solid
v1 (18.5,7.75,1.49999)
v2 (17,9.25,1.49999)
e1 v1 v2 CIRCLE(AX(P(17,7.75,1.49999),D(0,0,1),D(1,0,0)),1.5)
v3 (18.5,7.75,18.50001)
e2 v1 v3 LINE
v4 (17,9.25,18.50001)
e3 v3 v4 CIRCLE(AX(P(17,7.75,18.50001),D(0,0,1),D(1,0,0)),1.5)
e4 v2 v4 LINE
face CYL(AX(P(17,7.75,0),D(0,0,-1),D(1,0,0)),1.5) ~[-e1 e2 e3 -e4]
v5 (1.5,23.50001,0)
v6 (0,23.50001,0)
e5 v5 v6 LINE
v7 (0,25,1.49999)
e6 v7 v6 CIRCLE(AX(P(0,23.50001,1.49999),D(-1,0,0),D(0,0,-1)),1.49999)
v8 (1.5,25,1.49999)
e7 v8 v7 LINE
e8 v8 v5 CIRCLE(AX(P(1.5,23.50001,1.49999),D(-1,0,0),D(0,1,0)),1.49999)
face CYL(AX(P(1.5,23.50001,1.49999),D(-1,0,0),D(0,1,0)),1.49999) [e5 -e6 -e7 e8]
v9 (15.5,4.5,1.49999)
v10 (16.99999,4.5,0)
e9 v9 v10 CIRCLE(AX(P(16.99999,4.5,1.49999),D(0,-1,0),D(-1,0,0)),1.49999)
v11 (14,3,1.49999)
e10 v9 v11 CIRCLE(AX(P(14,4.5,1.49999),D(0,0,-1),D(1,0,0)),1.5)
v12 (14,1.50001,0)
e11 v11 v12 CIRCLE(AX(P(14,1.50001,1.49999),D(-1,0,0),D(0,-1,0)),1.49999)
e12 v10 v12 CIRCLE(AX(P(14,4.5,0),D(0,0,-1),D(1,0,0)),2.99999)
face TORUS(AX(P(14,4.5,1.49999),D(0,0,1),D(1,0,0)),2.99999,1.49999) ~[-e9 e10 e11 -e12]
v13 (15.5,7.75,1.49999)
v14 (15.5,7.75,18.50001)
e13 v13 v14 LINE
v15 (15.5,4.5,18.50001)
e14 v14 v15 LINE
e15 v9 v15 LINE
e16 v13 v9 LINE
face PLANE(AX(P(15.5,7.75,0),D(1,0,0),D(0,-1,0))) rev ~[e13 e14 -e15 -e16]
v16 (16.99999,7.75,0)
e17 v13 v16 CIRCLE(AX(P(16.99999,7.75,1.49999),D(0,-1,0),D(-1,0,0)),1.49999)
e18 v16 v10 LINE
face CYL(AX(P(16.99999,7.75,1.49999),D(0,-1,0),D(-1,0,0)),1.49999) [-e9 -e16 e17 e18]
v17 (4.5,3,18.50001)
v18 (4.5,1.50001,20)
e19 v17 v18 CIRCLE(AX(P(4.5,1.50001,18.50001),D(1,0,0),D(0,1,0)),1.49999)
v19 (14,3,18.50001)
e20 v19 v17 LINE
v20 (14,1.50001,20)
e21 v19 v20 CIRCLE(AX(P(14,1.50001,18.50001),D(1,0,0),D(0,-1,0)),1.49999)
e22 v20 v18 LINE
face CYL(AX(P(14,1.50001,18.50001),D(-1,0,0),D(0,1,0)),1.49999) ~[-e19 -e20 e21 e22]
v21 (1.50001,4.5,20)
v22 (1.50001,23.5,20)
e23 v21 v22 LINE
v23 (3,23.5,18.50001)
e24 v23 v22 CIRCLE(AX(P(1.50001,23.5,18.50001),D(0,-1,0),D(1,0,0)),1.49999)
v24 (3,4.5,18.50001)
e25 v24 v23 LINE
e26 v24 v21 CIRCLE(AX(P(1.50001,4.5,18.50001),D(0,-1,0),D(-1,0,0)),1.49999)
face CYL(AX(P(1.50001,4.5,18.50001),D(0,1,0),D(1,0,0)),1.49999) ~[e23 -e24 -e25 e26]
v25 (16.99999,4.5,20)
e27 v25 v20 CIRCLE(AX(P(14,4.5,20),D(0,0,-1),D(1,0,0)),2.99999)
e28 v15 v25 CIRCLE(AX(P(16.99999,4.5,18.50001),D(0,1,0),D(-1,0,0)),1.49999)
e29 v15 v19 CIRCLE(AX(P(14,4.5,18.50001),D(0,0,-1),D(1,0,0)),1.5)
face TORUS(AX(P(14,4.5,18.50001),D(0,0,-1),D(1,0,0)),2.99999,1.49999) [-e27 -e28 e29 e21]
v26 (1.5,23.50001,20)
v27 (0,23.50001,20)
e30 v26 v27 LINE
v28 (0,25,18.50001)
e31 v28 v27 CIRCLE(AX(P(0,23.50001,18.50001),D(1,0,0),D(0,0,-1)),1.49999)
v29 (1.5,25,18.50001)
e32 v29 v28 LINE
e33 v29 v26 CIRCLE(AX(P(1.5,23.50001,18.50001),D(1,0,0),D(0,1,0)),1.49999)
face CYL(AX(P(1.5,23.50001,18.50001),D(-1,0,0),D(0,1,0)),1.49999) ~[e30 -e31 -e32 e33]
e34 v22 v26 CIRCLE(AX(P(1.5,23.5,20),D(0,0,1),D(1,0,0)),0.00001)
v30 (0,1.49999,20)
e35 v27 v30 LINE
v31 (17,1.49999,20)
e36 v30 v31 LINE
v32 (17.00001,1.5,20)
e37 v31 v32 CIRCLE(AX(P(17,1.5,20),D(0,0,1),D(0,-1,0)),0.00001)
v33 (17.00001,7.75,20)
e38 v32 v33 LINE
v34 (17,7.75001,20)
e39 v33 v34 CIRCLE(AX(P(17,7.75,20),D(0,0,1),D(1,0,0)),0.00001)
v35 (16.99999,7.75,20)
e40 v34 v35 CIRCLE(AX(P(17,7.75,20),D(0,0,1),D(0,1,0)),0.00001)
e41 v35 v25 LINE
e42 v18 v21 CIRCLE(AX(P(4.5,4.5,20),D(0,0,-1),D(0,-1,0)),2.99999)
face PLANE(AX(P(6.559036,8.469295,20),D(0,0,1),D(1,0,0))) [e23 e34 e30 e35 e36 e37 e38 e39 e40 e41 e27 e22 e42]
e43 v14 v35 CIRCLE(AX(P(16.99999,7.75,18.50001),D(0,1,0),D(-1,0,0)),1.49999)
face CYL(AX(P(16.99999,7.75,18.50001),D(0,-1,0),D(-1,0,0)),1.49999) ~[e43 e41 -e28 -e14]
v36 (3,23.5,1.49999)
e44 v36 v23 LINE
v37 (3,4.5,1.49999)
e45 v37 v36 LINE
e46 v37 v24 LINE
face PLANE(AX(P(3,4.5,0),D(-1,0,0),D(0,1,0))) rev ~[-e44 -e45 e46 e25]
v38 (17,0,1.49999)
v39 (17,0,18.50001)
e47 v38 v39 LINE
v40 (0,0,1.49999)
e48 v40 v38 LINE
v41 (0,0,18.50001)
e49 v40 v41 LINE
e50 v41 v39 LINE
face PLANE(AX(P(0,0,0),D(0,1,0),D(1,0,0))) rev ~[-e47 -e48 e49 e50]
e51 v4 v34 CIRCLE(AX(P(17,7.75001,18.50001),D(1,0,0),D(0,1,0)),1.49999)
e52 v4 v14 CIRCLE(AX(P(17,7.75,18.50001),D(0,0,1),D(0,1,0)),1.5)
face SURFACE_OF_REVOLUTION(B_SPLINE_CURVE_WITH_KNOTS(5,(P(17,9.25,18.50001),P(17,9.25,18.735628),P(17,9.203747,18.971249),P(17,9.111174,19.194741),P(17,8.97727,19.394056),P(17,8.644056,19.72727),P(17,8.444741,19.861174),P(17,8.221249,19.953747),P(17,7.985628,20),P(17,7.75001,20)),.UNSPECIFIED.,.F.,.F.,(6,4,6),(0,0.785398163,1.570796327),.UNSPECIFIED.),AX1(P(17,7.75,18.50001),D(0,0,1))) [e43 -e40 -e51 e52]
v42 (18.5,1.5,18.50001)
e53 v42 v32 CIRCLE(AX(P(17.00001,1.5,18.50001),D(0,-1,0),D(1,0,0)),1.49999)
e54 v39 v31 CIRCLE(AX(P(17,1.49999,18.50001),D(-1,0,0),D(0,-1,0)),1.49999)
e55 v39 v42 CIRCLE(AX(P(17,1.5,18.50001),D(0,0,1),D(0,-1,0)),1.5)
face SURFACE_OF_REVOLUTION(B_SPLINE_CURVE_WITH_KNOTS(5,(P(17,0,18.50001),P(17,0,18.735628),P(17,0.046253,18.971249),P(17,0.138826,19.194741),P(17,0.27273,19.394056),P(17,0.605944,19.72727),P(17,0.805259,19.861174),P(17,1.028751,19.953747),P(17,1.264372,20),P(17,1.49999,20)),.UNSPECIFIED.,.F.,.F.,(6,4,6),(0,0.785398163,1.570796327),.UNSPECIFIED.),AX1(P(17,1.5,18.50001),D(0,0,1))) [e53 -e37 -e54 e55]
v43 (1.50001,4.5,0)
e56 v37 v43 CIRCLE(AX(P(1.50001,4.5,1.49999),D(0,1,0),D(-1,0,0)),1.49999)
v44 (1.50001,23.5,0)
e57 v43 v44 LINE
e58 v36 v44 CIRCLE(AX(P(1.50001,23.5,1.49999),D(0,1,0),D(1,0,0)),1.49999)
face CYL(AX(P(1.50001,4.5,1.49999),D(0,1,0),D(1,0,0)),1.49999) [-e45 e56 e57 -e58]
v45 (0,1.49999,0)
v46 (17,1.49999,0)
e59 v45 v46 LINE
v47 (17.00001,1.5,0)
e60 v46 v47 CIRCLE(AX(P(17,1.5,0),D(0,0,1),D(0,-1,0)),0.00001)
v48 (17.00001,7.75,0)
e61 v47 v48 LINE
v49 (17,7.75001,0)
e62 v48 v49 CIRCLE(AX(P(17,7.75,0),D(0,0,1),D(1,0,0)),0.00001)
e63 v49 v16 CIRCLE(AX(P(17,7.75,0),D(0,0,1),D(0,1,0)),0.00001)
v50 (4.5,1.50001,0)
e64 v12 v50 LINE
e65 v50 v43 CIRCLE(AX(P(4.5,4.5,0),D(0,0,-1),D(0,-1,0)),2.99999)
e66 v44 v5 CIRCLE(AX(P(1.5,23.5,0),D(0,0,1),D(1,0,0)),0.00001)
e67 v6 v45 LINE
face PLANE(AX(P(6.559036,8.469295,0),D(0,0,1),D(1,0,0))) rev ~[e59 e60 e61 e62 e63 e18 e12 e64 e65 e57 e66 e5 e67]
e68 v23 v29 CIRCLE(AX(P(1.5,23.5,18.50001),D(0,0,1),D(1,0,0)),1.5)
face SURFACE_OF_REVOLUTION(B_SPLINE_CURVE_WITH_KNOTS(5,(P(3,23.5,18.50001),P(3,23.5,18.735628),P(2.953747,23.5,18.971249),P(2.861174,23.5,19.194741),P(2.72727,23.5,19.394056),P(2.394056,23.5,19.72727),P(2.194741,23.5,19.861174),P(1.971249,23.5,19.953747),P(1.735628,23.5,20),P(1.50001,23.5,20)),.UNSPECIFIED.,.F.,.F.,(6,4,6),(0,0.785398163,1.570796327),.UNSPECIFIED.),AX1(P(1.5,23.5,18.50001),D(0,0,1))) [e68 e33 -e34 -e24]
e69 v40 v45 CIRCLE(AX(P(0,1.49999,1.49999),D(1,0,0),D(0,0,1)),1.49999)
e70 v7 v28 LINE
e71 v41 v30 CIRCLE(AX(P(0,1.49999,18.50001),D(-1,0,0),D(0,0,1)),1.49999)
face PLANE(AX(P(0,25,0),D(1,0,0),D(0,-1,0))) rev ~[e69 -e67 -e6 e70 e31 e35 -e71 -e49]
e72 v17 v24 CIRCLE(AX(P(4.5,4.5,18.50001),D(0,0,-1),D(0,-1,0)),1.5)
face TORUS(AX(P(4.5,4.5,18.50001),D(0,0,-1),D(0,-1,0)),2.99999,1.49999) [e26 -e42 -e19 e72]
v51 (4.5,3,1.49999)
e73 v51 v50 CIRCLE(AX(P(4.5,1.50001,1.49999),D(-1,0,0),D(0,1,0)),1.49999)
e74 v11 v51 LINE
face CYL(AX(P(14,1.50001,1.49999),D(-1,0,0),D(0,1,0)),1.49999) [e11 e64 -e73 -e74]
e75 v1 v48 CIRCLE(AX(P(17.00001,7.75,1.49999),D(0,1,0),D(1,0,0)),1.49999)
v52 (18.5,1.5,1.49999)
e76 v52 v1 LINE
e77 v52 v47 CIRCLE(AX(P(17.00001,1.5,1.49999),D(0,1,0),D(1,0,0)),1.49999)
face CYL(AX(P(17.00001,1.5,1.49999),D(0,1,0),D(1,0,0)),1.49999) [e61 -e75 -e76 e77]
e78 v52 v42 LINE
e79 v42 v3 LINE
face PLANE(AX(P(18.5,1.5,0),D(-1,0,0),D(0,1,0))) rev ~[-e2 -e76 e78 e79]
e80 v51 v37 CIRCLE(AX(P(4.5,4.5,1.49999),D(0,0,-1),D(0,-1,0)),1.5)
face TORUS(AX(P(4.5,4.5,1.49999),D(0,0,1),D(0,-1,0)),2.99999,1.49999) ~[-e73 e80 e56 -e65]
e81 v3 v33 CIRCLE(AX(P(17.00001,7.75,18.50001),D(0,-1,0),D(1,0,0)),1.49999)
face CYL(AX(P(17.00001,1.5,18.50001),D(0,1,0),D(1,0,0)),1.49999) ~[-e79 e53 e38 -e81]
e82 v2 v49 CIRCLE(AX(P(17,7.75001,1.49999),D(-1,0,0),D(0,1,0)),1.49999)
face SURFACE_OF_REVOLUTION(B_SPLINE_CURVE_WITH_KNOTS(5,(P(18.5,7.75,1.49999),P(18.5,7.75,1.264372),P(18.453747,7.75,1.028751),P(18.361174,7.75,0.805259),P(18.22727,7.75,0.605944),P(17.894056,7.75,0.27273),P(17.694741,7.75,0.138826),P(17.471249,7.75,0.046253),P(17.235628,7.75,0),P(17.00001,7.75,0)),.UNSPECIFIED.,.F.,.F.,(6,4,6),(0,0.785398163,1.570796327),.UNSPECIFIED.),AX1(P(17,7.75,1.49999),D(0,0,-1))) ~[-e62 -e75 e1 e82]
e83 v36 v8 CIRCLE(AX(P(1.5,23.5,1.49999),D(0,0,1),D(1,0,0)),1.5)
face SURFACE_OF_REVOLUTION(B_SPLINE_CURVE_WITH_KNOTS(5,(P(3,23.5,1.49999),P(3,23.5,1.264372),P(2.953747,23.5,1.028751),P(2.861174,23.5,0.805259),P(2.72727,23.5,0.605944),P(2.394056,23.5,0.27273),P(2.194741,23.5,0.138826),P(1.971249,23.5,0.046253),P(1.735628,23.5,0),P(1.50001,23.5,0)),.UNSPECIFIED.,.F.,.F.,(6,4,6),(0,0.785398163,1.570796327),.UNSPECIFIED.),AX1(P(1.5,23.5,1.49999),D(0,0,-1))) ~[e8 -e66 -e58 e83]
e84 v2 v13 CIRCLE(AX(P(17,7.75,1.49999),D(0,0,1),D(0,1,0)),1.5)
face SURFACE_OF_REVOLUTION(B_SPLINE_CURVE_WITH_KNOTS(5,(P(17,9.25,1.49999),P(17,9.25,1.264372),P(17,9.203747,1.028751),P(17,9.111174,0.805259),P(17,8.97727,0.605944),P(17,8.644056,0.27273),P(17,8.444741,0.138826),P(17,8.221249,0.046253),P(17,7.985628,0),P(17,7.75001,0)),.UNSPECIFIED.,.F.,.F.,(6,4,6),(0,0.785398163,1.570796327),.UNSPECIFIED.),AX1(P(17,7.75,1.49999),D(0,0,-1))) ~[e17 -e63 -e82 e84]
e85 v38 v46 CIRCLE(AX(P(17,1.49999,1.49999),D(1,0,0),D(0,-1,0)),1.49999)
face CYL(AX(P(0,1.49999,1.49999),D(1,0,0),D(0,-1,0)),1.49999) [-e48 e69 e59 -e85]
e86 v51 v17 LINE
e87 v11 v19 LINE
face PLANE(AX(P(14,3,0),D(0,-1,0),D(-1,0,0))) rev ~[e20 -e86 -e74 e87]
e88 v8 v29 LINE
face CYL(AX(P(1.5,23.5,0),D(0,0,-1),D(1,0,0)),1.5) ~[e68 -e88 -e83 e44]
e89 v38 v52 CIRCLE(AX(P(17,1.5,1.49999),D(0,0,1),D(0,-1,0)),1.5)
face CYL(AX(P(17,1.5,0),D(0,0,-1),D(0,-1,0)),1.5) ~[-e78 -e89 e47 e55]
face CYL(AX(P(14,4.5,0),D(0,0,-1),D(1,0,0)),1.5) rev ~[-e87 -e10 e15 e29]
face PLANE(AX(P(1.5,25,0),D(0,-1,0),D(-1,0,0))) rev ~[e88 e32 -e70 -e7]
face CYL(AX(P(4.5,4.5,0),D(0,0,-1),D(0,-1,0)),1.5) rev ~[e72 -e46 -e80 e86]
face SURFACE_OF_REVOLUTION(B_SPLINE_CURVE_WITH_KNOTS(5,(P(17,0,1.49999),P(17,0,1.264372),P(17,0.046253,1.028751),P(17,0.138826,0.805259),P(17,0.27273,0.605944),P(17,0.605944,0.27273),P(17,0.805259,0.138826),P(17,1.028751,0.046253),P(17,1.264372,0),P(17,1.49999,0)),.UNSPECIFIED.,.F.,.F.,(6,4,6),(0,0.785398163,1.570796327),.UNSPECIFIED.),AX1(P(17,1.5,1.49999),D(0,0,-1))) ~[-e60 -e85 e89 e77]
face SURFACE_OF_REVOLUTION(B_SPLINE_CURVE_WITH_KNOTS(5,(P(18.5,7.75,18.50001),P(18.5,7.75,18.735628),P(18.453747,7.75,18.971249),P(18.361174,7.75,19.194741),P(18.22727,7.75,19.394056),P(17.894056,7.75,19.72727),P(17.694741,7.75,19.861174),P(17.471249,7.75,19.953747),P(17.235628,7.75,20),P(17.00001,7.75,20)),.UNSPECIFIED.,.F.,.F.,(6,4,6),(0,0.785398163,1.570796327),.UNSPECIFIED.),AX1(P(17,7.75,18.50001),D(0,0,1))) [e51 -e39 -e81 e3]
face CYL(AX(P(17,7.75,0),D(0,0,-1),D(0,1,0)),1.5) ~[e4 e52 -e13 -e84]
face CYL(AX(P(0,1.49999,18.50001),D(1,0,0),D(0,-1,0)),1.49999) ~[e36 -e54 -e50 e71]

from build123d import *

# Parameters (mm, degrees)
F1_DEPTH = 20
F2_R     = 1.49999


# Not quite as in the source:
# - a fillet or chamfer is up to 0.001 mm smaller than in the source, because OpenCascade refuses the exact size


with BuildPart() as f1:
    # F0 (on Top) → F1 (new body)
    with BuildSketch(Plane.XY):
        with BuildLine():
            Line((1.5, 25), (0, 25))
            Line((0, 25), (0, 0))
            Line((0, 0), (17, 0))
            ThreePointArc((17, 0), (18.0606601718, 0.4393398282), (18.5, 1.5))
            Line((18.5, 1.5), (18.5, 7.75))
            ThreePointArc((18.5, 7.75), (18.0606601718, 8.8106601718), (17, 9.25))
            ThreePointArc((17, 9.25), (15.9393398282, 8.8106601718), (15.5, 7.75))
            Line((15.5, 7.75), (15.5, 4.5))
            ThreePointArc((15.5, 4.5), (15.0606601718, 3.4393398282), (14, 3))
            Line((14, 3), (4.5, 3))
            ThreePointArc((4.5, 3), (3.4393398282, 3.4393398282), (3, 4.5))
            Line((3, 4.5), (3, 23.5))
            ThreePointArc((3, 23.5), (2.5606601718, 24.5606601718), (1.5, 25))
        make_face()
    extrude(amount=F1_DEPTH)

    # F2 (radius 1.5 in the source; OpenCascade refuses exactly that, so slightly less here)
    f2_edges = [f1.edges().sort_by_distance(p)[0] for p in [
        (3, 14, 20),
        (9.25, 3, 0),
    ]]
    fillet(f2_edges, radius=F2_R)


solid = f1.part
